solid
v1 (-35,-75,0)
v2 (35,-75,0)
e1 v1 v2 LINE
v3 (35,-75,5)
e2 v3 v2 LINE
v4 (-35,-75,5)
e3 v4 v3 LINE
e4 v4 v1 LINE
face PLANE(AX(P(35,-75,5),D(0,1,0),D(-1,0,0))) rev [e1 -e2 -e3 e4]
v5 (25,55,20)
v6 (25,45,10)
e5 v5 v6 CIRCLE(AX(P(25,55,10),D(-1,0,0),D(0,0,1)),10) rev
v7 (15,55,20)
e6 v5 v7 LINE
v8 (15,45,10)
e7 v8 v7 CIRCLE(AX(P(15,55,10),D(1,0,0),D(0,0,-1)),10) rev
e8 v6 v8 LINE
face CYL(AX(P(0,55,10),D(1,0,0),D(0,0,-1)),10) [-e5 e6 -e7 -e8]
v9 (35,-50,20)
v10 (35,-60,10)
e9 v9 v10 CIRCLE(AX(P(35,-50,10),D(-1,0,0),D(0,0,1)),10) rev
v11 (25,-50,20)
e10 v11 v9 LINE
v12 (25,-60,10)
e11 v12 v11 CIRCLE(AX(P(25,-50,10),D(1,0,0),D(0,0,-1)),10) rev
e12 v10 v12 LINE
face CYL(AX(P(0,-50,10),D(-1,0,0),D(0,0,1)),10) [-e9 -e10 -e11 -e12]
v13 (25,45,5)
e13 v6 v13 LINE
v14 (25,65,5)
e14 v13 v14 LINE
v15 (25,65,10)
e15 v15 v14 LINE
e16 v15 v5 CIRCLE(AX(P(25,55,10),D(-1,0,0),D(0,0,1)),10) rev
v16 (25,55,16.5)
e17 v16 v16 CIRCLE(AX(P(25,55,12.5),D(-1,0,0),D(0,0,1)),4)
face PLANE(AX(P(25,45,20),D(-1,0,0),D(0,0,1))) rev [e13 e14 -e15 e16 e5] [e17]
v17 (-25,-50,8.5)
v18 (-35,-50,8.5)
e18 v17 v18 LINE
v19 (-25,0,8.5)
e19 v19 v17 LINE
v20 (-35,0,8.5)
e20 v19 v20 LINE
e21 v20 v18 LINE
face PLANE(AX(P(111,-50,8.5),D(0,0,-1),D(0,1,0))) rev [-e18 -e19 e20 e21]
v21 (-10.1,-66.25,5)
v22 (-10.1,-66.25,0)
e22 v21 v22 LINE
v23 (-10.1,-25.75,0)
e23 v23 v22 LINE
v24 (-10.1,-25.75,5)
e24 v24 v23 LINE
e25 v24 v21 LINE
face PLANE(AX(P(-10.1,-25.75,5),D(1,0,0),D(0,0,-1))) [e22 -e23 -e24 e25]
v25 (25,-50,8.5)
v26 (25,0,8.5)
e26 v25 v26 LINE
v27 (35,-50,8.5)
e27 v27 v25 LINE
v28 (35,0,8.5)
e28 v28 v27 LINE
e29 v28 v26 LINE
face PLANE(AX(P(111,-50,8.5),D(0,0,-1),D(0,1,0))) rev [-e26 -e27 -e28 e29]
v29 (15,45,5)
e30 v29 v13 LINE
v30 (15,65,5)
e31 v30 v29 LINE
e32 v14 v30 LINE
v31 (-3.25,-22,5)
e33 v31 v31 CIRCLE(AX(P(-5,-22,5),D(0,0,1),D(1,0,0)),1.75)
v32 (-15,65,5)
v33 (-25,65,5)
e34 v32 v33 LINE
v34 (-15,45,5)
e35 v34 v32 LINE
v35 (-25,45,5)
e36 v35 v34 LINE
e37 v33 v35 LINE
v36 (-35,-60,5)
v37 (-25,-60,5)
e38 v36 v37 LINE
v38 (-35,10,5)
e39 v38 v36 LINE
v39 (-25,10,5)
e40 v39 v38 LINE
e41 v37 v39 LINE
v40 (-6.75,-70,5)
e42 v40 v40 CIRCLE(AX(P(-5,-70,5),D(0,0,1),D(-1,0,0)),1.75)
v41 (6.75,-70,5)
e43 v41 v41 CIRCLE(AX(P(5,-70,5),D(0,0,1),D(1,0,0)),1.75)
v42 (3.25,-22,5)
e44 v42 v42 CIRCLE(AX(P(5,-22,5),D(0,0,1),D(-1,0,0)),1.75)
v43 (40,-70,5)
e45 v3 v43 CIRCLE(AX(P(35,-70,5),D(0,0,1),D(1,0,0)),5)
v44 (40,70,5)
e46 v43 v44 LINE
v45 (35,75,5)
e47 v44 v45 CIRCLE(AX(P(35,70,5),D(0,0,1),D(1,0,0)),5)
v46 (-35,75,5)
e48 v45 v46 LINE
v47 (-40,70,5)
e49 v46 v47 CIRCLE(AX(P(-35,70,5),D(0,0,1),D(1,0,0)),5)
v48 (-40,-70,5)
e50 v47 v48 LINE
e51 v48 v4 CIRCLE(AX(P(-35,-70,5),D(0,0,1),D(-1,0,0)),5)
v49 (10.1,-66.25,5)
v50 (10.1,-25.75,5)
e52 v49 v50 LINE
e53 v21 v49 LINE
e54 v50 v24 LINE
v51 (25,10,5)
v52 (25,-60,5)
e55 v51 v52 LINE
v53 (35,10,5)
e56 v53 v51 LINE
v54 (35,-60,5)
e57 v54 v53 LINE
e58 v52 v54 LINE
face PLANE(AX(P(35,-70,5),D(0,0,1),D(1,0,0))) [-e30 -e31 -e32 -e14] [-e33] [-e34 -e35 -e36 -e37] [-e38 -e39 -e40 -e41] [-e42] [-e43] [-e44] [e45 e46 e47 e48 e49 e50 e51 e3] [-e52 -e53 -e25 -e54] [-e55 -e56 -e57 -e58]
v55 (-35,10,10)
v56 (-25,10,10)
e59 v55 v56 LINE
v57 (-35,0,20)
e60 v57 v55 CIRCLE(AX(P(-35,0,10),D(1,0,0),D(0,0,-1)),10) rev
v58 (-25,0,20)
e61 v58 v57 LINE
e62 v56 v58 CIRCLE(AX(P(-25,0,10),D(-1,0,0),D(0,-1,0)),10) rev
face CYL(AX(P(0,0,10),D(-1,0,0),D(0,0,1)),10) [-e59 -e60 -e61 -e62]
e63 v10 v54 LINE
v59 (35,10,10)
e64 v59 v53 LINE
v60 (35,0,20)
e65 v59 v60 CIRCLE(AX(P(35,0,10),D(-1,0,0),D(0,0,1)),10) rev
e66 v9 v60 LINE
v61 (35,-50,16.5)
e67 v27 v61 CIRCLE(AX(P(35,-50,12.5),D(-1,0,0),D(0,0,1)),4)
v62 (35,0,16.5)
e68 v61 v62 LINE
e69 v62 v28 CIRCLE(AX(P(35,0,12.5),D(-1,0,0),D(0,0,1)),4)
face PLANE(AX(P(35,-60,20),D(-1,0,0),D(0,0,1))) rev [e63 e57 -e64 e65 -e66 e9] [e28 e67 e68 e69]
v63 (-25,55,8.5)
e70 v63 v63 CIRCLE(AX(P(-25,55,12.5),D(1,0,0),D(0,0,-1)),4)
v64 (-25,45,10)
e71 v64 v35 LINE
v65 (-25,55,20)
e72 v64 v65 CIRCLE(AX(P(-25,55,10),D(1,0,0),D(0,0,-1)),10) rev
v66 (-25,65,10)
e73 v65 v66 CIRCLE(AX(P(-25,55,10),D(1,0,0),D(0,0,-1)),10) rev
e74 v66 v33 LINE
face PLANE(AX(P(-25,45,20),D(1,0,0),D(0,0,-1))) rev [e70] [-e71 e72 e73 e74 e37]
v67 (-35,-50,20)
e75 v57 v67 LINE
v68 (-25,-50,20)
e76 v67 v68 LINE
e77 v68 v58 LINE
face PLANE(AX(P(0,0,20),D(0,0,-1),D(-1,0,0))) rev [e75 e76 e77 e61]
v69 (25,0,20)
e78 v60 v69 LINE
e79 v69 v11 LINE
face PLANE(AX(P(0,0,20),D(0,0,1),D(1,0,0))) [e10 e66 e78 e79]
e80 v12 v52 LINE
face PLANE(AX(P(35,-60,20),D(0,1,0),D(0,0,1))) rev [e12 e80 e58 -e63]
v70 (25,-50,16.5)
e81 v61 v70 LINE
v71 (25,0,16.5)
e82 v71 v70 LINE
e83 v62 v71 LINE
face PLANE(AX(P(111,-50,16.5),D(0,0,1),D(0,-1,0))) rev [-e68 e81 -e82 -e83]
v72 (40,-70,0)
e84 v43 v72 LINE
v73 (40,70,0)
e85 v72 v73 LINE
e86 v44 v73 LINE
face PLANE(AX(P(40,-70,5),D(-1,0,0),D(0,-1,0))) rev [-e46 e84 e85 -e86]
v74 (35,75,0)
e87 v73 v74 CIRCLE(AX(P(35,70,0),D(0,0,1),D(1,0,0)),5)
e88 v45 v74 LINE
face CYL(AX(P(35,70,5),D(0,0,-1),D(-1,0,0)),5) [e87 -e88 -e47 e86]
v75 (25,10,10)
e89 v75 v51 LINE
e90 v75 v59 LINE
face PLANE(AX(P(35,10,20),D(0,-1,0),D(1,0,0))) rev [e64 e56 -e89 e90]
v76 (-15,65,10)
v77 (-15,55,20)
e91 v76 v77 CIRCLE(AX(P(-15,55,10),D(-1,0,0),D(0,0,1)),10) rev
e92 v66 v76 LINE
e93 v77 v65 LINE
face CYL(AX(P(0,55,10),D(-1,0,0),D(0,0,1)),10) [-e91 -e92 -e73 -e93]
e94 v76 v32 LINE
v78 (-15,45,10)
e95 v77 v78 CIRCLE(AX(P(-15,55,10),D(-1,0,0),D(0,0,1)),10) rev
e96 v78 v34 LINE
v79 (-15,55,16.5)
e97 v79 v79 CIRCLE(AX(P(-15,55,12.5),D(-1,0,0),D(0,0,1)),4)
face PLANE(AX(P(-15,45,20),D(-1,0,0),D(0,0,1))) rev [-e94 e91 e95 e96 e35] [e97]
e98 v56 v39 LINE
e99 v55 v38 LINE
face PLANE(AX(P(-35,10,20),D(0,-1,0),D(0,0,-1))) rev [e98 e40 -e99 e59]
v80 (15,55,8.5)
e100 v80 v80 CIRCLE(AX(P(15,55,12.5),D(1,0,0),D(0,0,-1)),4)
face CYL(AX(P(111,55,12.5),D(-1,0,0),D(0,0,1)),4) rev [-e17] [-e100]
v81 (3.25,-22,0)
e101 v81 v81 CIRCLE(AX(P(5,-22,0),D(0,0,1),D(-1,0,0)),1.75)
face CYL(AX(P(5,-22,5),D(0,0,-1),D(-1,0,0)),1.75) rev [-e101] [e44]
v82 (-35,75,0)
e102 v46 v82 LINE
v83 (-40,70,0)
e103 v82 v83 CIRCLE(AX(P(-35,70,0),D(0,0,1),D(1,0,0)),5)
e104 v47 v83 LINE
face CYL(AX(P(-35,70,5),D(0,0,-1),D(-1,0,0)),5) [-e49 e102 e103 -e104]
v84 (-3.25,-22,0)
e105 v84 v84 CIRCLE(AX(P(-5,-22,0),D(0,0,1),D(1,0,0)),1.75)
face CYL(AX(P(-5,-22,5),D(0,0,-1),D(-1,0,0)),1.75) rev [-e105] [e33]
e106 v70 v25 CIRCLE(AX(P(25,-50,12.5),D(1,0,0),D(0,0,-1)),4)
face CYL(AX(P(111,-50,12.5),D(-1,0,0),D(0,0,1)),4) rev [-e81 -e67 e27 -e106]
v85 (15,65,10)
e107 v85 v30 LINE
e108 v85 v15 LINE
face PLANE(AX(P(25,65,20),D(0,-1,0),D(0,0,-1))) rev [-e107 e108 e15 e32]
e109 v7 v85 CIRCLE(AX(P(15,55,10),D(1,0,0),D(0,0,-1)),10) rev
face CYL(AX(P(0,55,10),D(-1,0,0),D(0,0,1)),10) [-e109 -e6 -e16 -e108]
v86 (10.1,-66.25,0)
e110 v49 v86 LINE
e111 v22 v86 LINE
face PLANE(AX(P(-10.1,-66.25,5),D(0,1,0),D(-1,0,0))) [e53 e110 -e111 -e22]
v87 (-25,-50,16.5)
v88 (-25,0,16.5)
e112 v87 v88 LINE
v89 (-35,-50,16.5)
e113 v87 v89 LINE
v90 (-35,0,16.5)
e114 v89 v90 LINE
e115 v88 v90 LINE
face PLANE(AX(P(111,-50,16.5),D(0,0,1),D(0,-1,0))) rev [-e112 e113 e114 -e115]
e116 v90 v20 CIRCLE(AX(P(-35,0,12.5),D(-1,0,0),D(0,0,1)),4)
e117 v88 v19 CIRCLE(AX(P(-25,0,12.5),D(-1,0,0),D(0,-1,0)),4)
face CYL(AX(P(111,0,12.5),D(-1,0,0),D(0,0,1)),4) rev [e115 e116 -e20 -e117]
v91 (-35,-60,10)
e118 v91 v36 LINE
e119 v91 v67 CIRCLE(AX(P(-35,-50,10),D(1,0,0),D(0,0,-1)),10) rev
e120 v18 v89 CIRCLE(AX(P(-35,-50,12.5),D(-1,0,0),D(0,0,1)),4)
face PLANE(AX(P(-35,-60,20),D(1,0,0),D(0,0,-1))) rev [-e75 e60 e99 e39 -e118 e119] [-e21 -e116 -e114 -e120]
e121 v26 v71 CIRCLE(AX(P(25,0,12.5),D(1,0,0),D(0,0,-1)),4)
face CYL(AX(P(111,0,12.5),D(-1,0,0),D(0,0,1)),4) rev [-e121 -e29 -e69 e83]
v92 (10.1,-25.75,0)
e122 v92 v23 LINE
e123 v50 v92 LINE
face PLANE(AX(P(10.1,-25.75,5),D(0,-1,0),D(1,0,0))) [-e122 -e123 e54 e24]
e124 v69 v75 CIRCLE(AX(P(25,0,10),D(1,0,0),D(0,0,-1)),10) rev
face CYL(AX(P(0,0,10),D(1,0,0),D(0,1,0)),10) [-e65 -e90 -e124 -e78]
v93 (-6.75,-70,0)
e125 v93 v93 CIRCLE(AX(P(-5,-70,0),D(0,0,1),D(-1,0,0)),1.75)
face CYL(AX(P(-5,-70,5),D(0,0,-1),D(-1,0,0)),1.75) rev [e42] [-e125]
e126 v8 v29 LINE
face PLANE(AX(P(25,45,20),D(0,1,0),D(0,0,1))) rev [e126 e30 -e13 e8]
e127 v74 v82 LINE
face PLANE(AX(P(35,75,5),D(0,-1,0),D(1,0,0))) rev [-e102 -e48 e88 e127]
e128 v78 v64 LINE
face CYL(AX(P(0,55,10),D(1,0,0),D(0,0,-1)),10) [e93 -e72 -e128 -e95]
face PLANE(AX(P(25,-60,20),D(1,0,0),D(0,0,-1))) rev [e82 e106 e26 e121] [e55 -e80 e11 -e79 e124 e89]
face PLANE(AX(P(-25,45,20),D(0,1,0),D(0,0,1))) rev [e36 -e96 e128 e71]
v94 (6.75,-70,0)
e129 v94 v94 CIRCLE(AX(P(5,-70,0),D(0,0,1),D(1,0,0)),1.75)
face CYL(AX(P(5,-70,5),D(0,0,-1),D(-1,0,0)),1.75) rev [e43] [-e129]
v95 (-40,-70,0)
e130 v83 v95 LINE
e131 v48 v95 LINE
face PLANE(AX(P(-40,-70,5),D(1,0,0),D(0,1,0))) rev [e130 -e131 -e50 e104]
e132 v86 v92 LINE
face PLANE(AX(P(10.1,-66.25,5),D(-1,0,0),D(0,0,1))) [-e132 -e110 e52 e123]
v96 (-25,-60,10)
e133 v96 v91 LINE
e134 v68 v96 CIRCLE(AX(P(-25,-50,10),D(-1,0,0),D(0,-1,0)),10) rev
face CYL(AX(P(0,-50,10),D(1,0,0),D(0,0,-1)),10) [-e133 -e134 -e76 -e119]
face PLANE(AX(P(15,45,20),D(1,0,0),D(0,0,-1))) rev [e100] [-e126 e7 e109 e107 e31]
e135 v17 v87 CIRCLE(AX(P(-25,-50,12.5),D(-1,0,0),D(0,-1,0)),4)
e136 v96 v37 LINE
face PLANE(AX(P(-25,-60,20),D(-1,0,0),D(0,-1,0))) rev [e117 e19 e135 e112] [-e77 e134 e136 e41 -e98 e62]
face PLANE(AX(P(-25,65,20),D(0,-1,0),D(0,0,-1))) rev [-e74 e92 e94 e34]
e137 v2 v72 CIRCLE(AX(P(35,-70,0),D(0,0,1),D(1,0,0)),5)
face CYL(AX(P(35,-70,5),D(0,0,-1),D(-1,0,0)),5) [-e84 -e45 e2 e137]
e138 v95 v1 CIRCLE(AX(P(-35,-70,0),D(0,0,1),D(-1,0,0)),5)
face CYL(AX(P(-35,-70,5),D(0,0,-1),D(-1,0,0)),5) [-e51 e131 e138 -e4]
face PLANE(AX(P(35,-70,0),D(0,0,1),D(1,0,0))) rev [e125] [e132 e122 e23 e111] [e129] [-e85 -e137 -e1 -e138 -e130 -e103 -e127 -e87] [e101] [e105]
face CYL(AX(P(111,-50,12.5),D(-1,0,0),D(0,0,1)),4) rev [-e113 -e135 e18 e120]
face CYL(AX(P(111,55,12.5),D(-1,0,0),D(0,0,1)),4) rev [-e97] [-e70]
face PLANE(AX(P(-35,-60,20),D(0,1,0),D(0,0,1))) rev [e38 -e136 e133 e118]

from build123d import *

# Parameters (mm, degrees)
SKETCH_1_R          = 1.75
SKETCH_1_W          = 20.2
SKETCH_1_H          = 40.5
EXTRUDE_1_DEPTH     = 5
SKETCH_2_W          = 10
SKETCH_2_H          = 20
SKETCH_2_H_2        = 70
EXTRUDE_2_DEPTH     = 15
SKETCH_3_R          = 4
CUT_EXTRUDE_1_DEPTH = 146
FILLET_1_R          = 10


with BuildPart() as part:
    # 草图1 → 凸台-拉伸1 (new body)
    with BuildSketch(Plane.XY):
        with BuildLine():
            Line((35, -75), (-35, -75))
            ThreePointArc((-35, -75), (-38.535533906, -73.535533906), (-40, -70))
            Line((-40, -70), (-40, 70))
            ThreePointArc((-40, 70), (-38.535533906, 73.535533906), (-35, 75))
            Line((-35, 75), (35, 75))
            ThreePointArc((35, 75), (38.535533906, 73.535533906), (40, 70))
            Line((40, 70), (40, -70))
            ThreePointArc((40, -70), (38.535533906, -73.535533906), (35, -75))
        make_face()
        with Locations((-5, -22)):
            Circle(SKETCH_1_R, mode=Mode.SUBTRACT)
        with Locations(Location((5, -22, 0), (0, 0, 180))):
            Circle(SKETCH_1_R, mode=Mode.SUBTRACT)
        with Locations((5, -70)):
            Circle(SKETCH_1_R, mode=Mode.SUBTRACT)
        with Locations(Location((-5, -70, 0), (0, 0, 180))):
            Circle(SKETCH_1_R, mode=Mode.SUBTRACT)
        with Locations((0, -46)):
            Rectangle(SKETCH_1_W, SKETCH_1_H, mode=Mode.SUBTRACT)
    extrude(amount=EXTRUDE_1_DEPTH)

    # 草图2 → 凸台-拉伸2 (add)
    with BuildSketch(Plane.XY.offset(5)):
        with Locations((20, 55)):
            Rectangle(SKETCH_2_W, SKETCH_2_H)
        with Locations((30, -25)):
            Rectangle(SKETCH_2_W, SKETCH_2_H_2)
        with Locations((-30, -25)):
            Rectangle(SKETCH_2_W, SKETCH_2_H_2)
        with Locations((-20, 55)):
            Rectangle(SKETCH_2_W, SKETCH_2_H)
    extrude(amount=EXTRUDE_2_DEPTH)

    # 草图3 → 切除-拉伸1 (cut)
    with BuildSketch(Plane.ZY.offset(35)):
        with Locations((12.5, 55)):
            Circle(SKETCH_3_R)
        with BuildLine():
            Line((8.5, -50), (8.5, 0))
            ThreePointArc((8.5, 0), (12.5, 4), (16.5, 0))
            Line((16.5, 0), (16.5, -50))
            ThreePointArc((16.5, -50), (12.5, -54), (8.5, -50))
        make_face()
    extrude(amount=-CUT_EXTRUDE_1_DEPTH, mode=Mode.SUBTRACT)

    # 圆角1
    fillet_1_edges = [part.edges().sort_by_distance(p)[0] for p in [
        (30, -60, 20),
        (-30, -60, 20),
        (30, 10, 20),
        (-30, 10, 20),
        (20, 45, 20),
        (20, 65, 20),
        (-20, 45, 20),
        (-20, 65, 20),
    ]]
    fillet(fillet_1_edges, radius=FILLET_1_R - 0.0001)  # a hair under: the kernel refuses the full size


solid = part.part
